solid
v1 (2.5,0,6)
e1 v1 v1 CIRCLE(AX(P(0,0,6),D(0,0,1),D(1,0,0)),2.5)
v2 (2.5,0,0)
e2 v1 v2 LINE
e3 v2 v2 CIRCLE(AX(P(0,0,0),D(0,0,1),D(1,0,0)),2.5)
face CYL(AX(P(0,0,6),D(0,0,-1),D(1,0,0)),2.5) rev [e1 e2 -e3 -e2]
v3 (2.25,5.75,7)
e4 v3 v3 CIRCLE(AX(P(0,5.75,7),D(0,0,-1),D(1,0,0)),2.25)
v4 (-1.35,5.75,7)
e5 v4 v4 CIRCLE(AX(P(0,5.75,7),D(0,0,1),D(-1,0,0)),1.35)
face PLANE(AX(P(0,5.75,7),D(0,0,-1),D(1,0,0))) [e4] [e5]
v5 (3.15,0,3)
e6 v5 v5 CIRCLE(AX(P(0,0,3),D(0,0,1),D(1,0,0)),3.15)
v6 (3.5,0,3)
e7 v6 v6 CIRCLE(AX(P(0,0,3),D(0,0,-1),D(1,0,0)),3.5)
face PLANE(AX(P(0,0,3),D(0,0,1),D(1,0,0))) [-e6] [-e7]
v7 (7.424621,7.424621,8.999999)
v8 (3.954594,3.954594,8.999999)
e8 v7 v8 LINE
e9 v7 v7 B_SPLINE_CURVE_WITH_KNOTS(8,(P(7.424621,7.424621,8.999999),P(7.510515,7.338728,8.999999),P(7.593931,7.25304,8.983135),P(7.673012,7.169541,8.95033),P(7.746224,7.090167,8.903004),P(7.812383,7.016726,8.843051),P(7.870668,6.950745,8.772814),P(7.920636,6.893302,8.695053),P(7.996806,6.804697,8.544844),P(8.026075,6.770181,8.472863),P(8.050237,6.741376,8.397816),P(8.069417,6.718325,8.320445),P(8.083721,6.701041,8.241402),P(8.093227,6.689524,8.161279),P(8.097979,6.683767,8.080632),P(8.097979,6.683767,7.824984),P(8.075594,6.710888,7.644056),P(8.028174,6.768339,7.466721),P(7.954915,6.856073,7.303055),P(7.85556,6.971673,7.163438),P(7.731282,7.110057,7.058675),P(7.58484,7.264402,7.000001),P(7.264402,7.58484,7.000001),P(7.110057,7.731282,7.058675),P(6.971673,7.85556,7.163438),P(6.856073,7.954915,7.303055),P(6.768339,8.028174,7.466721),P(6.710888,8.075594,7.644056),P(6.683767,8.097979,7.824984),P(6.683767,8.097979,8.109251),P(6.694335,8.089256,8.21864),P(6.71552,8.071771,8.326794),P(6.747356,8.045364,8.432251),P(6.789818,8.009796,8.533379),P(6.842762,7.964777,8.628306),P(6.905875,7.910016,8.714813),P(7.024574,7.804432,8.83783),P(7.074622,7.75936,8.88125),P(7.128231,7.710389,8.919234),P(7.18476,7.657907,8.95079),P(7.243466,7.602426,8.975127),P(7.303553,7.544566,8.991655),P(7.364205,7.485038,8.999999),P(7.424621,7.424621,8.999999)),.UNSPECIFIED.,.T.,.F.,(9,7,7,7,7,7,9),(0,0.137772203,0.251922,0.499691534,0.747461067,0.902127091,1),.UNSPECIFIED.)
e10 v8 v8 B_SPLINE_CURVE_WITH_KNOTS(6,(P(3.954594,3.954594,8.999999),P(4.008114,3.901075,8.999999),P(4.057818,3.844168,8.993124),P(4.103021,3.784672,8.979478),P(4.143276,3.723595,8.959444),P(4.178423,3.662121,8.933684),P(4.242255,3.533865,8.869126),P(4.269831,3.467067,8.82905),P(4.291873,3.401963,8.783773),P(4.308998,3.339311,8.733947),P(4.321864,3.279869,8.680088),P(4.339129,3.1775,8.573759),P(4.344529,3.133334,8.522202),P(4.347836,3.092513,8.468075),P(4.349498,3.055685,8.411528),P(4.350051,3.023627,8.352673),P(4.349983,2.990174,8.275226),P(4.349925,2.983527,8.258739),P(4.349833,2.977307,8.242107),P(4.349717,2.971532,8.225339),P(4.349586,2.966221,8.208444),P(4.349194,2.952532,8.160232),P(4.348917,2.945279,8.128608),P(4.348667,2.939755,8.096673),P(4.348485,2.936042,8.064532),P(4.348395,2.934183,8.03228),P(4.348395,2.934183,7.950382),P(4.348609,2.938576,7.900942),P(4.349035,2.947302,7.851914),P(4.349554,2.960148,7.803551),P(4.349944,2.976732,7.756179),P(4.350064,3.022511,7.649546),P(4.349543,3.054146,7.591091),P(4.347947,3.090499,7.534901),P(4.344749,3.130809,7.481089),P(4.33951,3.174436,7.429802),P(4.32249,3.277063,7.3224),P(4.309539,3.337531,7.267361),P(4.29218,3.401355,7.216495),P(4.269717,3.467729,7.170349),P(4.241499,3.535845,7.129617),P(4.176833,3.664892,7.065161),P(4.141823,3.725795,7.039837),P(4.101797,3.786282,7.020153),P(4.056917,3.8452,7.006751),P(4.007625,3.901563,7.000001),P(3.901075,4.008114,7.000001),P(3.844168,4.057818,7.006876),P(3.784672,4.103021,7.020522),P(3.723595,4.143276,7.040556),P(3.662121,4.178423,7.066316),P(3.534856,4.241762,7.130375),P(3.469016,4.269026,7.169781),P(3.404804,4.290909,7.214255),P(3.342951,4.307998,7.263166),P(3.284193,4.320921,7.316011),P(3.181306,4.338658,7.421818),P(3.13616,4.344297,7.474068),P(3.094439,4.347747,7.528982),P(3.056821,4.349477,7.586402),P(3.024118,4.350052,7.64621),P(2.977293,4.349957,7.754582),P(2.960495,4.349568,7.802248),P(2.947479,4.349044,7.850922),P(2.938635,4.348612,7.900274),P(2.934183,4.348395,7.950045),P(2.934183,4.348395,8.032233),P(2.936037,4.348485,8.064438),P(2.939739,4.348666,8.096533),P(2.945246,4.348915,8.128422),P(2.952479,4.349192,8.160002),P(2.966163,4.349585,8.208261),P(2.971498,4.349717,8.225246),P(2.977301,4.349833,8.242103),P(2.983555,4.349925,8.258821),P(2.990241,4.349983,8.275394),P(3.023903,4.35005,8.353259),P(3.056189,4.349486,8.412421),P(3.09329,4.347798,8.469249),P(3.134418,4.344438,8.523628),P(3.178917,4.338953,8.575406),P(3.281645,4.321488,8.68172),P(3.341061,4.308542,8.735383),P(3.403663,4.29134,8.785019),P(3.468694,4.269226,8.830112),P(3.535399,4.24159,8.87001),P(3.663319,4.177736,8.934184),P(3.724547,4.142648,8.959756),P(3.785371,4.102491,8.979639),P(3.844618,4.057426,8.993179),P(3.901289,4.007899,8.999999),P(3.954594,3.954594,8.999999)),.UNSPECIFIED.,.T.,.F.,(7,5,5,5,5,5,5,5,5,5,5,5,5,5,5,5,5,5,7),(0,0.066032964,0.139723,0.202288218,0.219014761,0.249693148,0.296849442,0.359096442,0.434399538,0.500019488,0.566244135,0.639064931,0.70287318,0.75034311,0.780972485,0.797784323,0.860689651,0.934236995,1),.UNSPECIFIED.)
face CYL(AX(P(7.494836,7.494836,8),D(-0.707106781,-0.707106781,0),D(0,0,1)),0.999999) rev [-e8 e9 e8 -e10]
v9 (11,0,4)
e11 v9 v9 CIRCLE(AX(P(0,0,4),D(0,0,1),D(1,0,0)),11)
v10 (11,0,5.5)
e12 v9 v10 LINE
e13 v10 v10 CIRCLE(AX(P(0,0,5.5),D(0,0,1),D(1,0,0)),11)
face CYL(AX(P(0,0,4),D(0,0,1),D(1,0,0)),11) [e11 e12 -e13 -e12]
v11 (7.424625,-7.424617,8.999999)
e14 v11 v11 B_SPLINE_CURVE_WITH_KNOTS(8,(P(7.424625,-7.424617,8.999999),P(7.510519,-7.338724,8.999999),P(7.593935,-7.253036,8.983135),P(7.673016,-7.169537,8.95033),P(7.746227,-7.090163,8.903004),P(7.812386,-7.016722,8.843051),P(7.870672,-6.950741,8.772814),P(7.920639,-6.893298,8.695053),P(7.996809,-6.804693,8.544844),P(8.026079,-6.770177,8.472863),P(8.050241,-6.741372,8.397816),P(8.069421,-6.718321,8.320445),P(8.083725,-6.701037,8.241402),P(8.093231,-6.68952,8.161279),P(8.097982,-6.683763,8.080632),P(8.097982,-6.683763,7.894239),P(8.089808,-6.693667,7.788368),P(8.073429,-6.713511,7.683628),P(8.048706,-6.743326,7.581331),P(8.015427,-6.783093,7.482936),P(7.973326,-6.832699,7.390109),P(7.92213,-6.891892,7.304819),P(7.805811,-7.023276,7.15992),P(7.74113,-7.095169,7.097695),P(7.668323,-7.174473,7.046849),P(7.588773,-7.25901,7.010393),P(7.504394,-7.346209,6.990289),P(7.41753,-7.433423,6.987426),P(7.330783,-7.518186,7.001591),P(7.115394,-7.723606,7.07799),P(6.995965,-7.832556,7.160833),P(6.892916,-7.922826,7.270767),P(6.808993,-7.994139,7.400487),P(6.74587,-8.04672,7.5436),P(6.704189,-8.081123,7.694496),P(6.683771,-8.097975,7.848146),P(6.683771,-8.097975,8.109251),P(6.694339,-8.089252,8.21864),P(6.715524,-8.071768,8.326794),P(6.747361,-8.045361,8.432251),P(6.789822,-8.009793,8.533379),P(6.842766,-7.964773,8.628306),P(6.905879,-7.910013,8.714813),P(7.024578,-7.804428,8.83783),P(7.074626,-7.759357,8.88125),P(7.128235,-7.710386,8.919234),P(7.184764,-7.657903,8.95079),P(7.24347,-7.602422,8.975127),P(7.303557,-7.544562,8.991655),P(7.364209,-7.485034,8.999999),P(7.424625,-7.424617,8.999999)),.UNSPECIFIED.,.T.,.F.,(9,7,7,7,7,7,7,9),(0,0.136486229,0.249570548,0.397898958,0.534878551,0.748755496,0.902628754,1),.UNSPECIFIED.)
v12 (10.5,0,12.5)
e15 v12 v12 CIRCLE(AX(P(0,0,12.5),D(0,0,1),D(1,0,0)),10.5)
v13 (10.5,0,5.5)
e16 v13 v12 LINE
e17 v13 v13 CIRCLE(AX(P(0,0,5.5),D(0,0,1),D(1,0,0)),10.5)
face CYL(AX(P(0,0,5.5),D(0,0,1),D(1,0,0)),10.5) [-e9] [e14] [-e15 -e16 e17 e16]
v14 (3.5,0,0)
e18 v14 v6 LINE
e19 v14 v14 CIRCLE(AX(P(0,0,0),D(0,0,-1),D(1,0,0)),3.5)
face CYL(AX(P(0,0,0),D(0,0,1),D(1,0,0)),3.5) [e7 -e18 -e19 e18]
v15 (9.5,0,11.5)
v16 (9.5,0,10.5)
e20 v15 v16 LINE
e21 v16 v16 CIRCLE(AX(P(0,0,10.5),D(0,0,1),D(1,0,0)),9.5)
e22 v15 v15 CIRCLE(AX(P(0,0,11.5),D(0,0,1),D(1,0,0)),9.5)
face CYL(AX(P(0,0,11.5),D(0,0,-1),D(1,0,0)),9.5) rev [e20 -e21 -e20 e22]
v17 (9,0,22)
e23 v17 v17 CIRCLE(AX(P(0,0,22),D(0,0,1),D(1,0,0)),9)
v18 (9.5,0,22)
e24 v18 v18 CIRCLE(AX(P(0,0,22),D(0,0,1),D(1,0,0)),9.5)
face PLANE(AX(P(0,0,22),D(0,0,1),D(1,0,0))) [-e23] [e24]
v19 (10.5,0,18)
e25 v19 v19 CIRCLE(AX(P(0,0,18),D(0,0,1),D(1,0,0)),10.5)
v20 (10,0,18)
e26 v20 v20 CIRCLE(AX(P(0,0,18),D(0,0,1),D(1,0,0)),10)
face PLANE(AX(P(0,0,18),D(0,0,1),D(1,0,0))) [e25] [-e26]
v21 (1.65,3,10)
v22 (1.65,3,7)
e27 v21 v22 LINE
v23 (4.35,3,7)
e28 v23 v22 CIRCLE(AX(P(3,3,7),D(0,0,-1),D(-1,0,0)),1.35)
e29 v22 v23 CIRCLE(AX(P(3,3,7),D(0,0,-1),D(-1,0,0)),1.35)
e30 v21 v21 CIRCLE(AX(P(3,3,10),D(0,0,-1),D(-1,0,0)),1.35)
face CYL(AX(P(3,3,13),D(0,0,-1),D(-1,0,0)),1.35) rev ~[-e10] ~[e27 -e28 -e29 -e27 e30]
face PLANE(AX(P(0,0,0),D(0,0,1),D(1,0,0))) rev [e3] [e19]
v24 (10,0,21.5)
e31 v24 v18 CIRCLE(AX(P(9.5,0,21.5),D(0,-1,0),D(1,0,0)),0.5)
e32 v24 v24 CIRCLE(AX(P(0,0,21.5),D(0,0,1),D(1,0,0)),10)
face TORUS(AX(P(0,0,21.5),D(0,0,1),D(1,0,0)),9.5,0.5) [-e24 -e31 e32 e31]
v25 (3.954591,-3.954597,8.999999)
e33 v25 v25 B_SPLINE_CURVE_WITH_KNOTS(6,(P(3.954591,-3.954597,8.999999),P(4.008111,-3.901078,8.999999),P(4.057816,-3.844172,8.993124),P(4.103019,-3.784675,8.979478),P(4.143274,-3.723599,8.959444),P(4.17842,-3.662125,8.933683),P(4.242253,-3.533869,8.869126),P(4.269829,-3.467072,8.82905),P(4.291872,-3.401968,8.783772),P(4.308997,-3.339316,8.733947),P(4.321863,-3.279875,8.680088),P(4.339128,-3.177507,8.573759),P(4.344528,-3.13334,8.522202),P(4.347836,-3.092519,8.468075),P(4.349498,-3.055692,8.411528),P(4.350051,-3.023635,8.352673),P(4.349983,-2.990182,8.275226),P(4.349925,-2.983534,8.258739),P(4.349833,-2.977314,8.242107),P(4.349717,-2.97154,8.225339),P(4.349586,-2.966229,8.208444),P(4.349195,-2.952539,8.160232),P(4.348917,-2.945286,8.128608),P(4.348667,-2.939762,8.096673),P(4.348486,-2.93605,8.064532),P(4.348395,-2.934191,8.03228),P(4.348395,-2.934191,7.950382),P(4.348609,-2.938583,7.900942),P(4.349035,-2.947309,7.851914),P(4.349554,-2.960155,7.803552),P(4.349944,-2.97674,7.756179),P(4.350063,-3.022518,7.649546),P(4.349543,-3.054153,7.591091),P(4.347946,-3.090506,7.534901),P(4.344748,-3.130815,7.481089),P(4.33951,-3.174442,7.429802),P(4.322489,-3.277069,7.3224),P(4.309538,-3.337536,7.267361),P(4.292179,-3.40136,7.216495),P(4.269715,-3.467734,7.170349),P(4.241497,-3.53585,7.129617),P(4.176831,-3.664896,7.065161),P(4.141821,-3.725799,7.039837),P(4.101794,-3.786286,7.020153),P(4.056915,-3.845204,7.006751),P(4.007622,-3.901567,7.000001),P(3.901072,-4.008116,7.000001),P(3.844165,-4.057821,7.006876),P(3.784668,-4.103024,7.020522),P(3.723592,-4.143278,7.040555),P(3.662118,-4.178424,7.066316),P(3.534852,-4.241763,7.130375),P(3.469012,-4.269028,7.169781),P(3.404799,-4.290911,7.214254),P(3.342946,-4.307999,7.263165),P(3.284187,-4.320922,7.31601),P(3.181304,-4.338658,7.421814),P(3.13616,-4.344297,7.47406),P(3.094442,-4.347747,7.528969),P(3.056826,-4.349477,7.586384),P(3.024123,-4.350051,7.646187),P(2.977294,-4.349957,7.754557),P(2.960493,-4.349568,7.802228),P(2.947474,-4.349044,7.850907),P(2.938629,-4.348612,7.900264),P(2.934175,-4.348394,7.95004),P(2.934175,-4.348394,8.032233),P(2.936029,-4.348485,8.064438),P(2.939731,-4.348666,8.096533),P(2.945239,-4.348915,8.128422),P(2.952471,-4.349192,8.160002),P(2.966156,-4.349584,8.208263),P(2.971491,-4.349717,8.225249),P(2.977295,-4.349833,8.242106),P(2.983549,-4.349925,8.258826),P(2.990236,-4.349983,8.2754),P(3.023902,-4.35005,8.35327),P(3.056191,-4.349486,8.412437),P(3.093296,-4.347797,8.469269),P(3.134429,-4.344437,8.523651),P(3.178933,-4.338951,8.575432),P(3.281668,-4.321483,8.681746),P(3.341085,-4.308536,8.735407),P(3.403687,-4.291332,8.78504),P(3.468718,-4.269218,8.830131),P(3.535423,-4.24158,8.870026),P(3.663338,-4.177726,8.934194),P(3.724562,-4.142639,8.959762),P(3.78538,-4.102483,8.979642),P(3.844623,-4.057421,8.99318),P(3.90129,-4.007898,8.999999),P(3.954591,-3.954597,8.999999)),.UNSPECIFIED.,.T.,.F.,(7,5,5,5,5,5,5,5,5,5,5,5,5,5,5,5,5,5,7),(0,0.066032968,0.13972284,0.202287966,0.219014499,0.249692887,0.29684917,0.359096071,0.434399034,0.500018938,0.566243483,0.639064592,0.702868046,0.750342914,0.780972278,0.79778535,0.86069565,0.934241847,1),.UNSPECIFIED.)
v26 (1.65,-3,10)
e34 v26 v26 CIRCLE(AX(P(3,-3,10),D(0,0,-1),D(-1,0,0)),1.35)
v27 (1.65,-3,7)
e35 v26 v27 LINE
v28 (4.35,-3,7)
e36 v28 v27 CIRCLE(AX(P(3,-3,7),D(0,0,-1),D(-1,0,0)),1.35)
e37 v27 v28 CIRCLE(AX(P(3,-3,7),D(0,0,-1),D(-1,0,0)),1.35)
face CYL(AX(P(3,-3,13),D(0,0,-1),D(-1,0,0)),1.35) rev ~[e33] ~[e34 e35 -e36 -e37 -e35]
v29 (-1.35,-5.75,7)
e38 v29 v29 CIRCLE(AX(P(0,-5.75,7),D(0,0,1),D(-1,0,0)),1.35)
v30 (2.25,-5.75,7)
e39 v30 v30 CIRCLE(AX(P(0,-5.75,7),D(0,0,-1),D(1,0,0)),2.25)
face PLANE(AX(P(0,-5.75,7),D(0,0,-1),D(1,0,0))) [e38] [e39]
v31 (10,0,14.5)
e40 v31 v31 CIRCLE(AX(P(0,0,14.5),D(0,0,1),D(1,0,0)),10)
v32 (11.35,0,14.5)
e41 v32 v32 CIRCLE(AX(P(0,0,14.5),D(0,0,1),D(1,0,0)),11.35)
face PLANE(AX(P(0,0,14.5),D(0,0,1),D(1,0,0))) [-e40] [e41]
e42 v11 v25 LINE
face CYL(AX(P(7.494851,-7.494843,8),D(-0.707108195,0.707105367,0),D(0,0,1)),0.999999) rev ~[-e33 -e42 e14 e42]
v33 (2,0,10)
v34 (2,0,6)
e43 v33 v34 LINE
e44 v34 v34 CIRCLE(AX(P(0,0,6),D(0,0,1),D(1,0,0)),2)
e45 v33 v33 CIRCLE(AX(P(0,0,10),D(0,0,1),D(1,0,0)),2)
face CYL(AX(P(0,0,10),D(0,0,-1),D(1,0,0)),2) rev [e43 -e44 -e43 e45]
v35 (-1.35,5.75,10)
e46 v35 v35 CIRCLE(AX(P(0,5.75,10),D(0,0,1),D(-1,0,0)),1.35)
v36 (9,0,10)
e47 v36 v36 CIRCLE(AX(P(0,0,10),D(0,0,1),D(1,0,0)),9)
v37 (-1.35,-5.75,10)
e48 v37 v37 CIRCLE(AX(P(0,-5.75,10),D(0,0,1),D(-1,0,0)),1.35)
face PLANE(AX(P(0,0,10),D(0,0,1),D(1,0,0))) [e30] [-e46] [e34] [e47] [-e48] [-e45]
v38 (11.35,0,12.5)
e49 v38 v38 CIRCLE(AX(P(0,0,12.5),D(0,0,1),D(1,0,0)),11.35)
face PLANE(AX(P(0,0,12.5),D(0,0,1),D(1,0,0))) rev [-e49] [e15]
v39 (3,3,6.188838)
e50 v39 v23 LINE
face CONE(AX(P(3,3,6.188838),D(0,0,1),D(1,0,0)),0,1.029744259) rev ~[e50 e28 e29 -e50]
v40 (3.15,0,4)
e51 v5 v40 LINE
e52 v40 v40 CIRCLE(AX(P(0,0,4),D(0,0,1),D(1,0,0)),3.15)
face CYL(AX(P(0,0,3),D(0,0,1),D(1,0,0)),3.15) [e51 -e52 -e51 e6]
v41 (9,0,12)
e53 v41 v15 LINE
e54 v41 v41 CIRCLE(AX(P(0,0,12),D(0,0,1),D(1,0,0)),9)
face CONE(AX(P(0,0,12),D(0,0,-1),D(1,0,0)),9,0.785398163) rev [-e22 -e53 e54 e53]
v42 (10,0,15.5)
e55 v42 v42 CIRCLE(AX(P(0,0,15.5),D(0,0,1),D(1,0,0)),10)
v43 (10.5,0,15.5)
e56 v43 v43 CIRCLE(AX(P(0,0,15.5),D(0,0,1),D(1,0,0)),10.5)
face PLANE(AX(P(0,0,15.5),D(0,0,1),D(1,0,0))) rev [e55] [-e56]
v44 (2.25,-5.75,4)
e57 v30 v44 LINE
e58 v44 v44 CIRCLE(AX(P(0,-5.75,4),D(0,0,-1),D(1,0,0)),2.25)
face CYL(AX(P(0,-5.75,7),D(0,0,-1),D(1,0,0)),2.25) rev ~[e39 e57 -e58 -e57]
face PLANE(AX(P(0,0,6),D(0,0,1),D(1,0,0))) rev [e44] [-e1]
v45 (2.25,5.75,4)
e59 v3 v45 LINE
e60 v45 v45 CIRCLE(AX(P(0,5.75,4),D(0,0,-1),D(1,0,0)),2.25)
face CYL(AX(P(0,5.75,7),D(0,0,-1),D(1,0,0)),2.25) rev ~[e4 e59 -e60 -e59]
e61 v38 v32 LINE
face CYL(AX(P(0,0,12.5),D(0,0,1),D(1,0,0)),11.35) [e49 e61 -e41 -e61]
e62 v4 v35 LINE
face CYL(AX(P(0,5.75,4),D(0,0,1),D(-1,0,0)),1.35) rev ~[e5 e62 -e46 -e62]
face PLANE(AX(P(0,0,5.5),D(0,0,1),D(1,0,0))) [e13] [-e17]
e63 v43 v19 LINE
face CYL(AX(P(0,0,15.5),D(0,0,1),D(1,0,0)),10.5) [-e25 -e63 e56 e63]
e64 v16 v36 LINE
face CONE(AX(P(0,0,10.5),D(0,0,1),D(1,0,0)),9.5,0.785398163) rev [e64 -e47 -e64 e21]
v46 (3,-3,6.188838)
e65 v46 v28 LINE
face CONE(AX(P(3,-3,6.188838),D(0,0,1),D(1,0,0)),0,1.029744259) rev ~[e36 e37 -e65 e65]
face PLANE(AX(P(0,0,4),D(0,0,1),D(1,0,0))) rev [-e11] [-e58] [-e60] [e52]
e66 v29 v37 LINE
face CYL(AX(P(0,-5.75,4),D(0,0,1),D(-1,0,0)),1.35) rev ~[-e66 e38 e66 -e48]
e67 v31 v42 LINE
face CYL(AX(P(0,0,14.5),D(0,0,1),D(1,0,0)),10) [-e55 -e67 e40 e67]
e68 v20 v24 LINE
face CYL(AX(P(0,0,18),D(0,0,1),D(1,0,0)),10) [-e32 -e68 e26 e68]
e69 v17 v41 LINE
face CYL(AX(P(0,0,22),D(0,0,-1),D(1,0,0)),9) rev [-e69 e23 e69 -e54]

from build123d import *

# Parameters (mm, degrees)
F3_D           = 2.7
F3_CBORE_D     = 4.5
F3_CBORE_DEPTH = 3
F5_D           = 2.7
F5_DEPTH       = 3
F5_TIP         = 0.8111618357
F7_W           = 12.7133149276
F7_H           = 0.9999985352


# Not quite as in the source:
# - a pattern or mirror of a feature is missing from the dataset's text; its kind, count and spacing are read off the source's solid


with BuildPart() as f1:
    # F0 (on Front) → F1 (revolve)
    with BuildSketch(Plane.XZ):
        with BuildLine():
            Line((9.5, 22), (9, 22))
            Line((9, 22), (9, 12))
            Line((9, 12), (9.5, 11.5))
            Line((9.5, 11.5), (9.5, 10.5))
            Line((9.5, 10.5), (9, 10))
            Line((9, 10), (2, 10))
            Line((2, 10), (2, 6))
            Line((2, 6), (2.5, 6))
            Line((2.5, 6), (2.5, 0))
            Line((2.5, 0), (3.5, 0))
            Line((3.5, 0), (3.5, 3))
            Line((3.5, 3), (3.15, 3))
            Line((3.15, 3), (3.15, 4))
            Line((3.15, 4), (11, 4))
            Line((11, 4), (11, 5.5))
            Line((11, 5.5), (10.5, 5.5))
            Line((10.5, 5.5), (10.5, 12.5))
            Line((10.5, 12.5), (11.35, 12.5))
            Line((11.35, 12.5), (11.35, 14.5))
            Line((11.35, 14.5), (10, 14.5))
            Line((10, 14.5), (10, 15.5))
            Line((10, 15.5), (10.5, 15.5))
            Line((10.5, 15.5), (10.5, 18))
            Line((10.5, 18), (10, 18))
            Line((10, 18), (10, 21.5))
            ThreePointArc((10, 21.5), (9.8535533906, 21.8535533906), (9.5, 22))
        make_face()
    revolve(axis=Axis((0, 0, 11), (0, 0, 1)))

    # F3 (through all)
    with Locations(Plane(origin=(0, 0, 4), x_dir=(1, 0, 0), z_dir=(0, 0, -1))):
        with Locations((0, -5.75), (0, 5.75)):
            CounterBoreHole(F3_D / 2, F3_CBORE_D / 2, F3_CBORE_DEPTH)

    # F5
    with Locations(Plane.XY.offset(10)):
        with Locations((3, -3), (3, 3)):
            Hole(F5_D / 2, depth=F5_DEPTH)
            with Locations((0, 0, -(F5_DEPTH + F5_TIP / 2))):  # 118° drill point
                Cone(0, F5_D / 2, F5_TIP, mode=Mode.SUBTRACT)

    # F7 (on face) → F8 (revolve, cut)
    with BuildSketch(Plane(origin=(0, 0, 0), x_dir=(-0.7071067812, -0.7071067812, 0), z_dir=(-0.7071067812, 0.7071067812, 0))):
        with Locations((-10.5992981509, 8.4999992676)):
            Rectangle(F7_W, F7_H)
    f8 = revolve(axis=Axis((7.4948355983, 7.4948355983, 8), (0.7071067812, 0.7071067812, 0)), mode=Mode.SUBTRACT)

    # F8_copies: F8 across plane
    add(f8.mirror(Plane(origin=(0, -1.1e-05, 0), x_dir=(-1, -1e-06, 0), z_dir=(1e-06, -1, 0))), mode=Mode.SUBTRACT)


solid = f1.part
